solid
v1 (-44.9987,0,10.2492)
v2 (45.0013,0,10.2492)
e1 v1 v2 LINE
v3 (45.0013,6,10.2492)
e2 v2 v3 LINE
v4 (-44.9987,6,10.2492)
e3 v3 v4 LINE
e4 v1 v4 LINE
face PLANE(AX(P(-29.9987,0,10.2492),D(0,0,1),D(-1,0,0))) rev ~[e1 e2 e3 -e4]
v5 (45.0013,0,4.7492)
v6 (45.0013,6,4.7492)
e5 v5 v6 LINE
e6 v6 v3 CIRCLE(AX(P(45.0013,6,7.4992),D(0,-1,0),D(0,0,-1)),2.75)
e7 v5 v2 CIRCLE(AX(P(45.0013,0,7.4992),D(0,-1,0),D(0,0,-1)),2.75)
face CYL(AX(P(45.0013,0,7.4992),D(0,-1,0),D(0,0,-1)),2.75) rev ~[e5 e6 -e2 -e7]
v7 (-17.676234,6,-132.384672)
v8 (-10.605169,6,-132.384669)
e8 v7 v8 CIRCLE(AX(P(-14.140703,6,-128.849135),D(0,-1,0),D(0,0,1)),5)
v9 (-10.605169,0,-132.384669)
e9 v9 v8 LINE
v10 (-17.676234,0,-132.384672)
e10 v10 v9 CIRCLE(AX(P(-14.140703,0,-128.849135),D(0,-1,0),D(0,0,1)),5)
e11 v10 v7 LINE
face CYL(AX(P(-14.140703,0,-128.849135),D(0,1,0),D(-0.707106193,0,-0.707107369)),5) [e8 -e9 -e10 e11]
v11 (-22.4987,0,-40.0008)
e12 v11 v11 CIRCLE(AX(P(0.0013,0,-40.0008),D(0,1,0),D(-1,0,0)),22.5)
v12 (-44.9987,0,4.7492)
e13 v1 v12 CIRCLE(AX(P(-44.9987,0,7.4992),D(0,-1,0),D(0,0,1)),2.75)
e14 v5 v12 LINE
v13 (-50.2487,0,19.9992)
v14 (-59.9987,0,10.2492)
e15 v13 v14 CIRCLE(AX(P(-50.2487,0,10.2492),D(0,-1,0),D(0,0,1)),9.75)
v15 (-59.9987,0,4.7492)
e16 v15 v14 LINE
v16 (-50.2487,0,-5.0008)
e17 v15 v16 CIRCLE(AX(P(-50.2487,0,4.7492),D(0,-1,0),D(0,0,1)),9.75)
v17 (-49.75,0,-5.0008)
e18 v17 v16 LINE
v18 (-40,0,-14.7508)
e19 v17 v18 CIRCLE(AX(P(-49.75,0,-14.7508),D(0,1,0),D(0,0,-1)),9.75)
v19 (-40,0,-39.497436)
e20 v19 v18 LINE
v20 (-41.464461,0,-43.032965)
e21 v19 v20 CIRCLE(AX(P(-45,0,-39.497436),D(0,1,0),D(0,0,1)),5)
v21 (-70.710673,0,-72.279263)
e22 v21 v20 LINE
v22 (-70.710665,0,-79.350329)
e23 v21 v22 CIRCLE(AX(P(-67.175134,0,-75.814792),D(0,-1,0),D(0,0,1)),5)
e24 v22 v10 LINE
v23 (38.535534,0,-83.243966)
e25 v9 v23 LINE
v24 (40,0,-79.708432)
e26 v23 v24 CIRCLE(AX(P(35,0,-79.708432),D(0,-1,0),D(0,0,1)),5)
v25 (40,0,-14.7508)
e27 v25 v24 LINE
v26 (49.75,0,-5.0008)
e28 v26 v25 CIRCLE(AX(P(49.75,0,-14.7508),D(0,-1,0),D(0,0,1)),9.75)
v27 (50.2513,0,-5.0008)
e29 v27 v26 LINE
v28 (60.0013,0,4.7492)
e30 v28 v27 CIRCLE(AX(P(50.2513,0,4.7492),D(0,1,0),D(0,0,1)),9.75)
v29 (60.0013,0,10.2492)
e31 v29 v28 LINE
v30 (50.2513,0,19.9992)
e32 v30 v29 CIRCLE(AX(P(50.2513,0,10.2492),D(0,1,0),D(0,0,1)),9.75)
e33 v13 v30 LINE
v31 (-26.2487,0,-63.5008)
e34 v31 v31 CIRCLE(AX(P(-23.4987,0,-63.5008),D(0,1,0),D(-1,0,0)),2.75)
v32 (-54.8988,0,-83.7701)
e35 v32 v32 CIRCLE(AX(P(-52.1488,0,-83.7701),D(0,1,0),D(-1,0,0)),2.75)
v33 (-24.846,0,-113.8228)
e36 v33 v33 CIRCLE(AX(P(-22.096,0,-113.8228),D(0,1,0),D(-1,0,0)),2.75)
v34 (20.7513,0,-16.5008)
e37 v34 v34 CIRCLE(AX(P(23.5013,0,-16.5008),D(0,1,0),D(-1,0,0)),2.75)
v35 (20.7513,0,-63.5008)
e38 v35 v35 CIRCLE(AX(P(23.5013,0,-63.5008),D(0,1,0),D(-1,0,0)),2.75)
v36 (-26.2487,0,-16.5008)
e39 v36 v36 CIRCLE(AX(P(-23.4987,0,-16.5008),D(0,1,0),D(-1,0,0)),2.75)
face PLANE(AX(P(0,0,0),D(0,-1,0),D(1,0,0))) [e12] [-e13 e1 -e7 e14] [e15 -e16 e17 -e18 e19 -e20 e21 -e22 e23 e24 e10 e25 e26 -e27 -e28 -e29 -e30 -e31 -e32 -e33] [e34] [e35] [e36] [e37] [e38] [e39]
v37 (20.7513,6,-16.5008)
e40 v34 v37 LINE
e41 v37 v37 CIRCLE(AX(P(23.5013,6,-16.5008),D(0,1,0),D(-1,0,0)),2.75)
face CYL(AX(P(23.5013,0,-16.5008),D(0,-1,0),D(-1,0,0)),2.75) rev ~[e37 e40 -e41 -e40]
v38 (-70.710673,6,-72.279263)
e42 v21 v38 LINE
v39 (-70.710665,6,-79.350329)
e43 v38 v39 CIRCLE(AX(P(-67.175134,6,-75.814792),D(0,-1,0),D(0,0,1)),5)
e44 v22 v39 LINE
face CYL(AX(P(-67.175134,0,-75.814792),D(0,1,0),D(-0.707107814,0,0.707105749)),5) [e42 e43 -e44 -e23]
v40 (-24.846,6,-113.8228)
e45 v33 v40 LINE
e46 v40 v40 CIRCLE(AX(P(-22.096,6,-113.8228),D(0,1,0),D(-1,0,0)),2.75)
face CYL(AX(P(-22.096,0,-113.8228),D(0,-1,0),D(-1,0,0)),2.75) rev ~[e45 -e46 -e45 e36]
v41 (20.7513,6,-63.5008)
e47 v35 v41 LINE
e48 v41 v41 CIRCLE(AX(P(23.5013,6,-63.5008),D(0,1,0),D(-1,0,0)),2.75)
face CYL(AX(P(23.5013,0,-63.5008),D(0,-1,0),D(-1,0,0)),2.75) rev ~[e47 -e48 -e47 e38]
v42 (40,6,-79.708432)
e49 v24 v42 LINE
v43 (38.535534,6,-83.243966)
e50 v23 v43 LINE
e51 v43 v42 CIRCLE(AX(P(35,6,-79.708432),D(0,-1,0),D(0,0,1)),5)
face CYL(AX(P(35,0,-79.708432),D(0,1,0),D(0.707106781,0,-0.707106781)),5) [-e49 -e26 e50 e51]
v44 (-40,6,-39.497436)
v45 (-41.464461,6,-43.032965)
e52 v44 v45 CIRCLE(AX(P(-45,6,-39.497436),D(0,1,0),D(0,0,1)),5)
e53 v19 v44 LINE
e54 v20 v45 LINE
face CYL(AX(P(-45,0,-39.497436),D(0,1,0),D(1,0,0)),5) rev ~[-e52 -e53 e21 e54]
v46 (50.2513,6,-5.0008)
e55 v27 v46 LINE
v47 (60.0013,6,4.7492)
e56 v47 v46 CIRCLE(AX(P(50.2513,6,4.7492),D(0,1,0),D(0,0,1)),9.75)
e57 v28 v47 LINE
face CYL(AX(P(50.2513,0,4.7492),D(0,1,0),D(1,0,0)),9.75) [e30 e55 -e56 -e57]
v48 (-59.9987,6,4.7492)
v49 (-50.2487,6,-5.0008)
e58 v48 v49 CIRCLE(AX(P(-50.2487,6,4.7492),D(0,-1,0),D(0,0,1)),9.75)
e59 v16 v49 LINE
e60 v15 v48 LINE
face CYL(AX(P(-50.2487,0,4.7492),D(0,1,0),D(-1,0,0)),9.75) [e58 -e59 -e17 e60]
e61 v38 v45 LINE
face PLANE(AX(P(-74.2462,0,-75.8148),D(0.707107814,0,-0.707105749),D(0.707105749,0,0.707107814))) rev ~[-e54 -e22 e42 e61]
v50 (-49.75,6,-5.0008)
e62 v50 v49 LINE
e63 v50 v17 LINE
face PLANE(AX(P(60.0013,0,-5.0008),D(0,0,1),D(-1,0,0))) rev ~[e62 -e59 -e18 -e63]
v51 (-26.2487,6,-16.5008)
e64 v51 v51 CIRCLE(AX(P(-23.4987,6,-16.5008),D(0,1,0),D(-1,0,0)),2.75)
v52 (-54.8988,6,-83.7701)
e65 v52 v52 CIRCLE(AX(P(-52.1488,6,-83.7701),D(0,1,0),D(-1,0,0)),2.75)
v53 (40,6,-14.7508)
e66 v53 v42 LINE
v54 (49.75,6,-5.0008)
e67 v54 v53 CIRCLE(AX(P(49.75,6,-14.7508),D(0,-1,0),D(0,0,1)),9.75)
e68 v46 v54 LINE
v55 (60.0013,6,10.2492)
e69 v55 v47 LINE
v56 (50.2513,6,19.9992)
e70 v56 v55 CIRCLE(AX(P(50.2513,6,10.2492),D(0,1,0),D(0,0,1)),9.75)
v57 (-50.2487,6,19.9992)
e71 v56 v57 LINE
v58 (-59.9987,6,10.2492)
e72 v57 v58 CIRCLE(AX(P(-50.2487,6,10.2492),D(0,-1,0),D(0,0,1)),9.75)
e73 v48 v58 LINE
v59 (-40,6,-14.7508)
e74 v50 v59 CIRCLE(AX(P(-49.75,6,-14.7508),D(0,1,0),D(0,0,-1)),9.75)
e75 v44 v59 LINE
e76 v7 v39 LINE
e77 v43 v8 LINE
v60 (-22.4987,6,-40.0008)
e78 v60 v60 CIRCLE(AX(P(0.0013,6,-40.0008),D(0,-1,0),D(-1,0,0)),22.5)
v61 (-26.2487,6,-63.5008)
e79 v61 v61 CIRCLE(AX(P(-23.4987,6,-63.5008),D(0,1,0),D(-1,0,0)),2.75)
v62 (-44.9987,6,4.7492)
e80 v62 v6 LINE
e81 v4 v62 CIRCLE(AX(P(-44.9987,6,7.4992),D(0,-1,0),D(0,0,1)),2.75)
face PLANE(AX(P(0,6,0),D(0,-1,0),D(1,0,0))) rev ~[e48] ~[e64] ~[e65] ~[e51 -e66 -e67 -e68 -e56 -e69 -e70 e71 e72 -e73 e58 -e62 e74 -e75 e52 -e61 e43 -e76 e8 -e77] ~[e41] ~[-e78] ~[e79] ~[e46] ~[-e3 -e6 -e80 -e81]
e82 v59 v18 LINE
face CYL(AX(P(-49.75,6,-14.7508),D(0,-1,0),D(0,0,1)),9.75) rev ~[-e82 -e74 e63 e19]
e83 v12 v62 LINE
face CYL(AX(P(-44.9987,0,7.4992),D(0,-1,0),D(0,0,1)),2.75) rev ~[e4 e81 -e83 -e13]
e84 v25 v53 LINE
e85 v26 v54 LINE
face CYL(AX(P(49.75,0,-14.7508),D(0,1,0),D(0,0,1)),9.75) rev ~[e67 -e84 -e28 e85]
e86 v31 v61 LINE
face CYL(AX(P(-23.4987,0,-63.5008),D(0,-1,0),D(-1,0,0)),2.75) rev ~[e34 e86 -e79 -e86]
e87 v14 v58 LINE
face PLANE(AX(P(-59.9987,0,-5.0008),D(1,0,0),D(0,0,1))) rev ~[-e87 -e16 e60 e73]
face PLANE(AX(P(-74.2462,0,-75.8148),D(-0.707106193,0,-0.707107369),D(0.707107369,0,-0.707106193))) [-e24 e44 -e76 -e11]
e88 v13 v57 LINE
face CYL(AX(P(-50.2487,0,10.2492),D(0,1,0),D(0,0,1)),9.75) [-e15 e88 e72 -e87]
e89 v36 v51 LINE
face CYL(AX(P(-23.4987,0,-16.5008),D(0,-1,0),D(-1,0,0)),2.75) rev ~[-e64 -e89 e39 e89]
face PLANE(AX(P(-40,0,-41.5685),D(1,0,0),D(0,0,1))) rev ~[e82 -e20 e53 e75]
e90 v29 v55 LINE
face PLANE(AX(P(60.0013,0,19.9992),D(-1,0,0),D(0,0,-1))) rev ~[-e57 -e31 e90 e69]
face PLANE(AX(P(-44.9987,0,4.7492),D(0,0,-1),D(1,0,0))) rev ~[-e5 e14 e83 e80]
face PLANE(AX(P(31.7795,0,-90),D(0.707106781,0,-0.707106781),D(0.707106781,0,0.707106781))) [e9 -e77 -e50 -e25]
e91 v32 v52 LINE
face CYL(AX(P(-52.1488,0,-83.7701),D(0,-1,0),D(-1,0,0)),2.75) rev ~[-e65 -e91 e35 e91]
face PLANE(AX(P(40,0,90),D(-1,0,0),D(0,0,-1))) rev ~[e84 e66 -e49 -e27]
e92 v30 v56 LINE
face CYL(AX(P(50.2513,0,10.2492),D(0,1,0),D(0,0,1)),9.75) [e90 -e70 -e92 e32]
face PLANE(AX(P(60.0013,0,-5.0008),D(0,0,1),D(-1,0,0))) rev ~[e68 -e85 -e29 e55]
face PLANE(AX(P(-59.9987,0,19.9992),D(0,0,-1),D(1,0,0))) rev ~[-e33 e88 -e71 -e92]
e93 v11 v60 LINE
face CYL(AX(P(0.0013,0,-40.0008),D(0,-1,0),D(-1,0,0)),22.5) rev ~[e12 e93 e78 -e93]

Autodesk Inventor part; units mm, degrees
ref_plane "YZ Plane" through (0, 0, 0) normal (1, 0, 0) x (0, 1, 0)
sketch "Sketch1" plane through (0, 0, 0) normal (0, 1, 0) x (-1, 0, 0)
  line L0 (40, 90) -> (-40, 90)
  line L1 (-40, 90) -> (-40, -81.7795)
  line L2 (40, -41.5685) -> (40, 90)
  line L3 (40, 90) -> (-40, -90) construction
  line L4 (-40, 90) -> (40, -90) construction
  circle A0 centre (-0.0013, 54.9992) radius 5.1
  line L5 (23.4987, -16.5008) -> (-23.5013, -16.5008) construction
  line L6 (-23.5013, -16.5008) -> (-23.5013, -63.5008) construction
  line L7 (-23.5013, -63.5008) -> (23.4987, -63.5008) construction
  line L8 (23.4987, -63.5008) -> (23.4987, -16.5008) construction
  line L9 (23.4987, -16.5008) -> (-23.5013, -63.5008) construction
  line L10 (-23.5013, -16.5008) -> (23.4987, -63.5008) construction
  circle A1 centre (23.4987, -16.5008) radius 2.75
  circle A2 centre (23.4987, -63.5008) radius 2.75
  circle A3 centre (-23.5013, -16.5008) radius 2.75
  circle A4 centre (-23.5013, -63.5008) radius 2.75
  line L11 (-0.0013, -90.0008) -> (-0.0013, -80) construction
  line L12 (19.9987, -11.0008) -> (-20.0013, -11.0008) construction
  line L13 (-20.0013, -11.0008) -> (-20.0013, -69.0008) construction
  line L14 (-20.0013, -69.0008) -> (19.9987, -69.0008) construction
  line L15 (19.9987, -69.0008) -> (19.9987, -11.0008) construction
  line L16 (19.9987, -11.0008) -> (-20.0013, -69.0008) construction
  line L17 (-20.0013, -11.0008) -> (19.9987, -69.0008) construction
  line L18 (-29.0013, -60.0008) -> (28.9987, -60.0008) construction
  line L19 (28.9987, -60.0008) -> (28.9987, -20.0008) construction
  line L20 (28.9987, -20.0008) -> (-29.0013, -20.0008) construction
  line L21 (-29.0013, -20.0008) -> (-29.0013, -60.0008)
  line L22 (-29.0013, -60.0008) -> (28.9987, -20.0008) construction
  line L23 (28.9987, -60.0008) -> (-29.0013, -20.0008) construction
  line L24 (-0.0013, 54.9992) -> (102.5291, -47.5313) construction
  line L25 (-0.0013, 54.9992) -> (144.9987, 54.9992) construction
  line L26 (28.2843, 83.2843) -> (-28.2843, 26.7157) construction
  line L27 (-28.2843, 26.7157) -> (74.2462, -75.8148) construction
  line L28 (74.2462, -75.8148) -> (130.8148, -19.2462) construction
  line L29 (130.8148, -19.2462) -> (28.2843, 83.2843) construction
  line L30 (28.2843, 83.2843) -> (74.2462, -75.8148) construction
  line L31 (-28.2843, 26.7157) -> (130.8148, -19.2462) construction
  line L32 (74.2462, -75.8148) -> (14.1407, -135.9202)
  line L33 (14.1407, -135.9202) -> (-0.0014, -121.7781)
  line L34 (-0.0014, -121.7781) -> (-31.7795, -90)
  line L35 (74.2462, -75.8148) -> (40, -41.5685)
  line L36 (-31.7795, -90) -> (-40, -81.7795)
  line L37 (44.1935, -105.8675) -> (37.1224, -98.7964)
  line L38 (37.1224, -98.7964) -> (52.1488, -83.7701) construction
  line L39 (37.1224, -98.7964) -> (22.096, -113.8228) construction
  circle A5 centre (52.1488, -83.7701) radius 2.75
  circle A6 centre (22.096, -113.8228) radius 2.75
  line L40 (-0.0013, 54.9992) -> (-0.0013, -40.0008)
  circle A7 centre (-0.0013, -40.0008) radius 22.5
  point P0 (0, 0)
  point P1 (51.2639, 3.7339)
  dimension "d0" = 80
  dimension "d1" = 180
  dimension "d3" = 10.2
  dimension "d5" = 47
  dimension "d6" = 47
  dimension "d7" = 5.5
  dimension "d8" = 5.5
  dimension "d9" = 5.5
  dimension "d10" = 5.5
  dimension "d12" = 40
  dimension "d13" = 58
  dimension "d14" = 58
  dimension "d15" = 40
  dimension "d27" = 45
  dimension "d28" = 145
  dimension "d29" = 80
  dimension "d30" = 145
  dimension "d31" = 85.002
  dimension "d32" = 20
  dimension "d33" = 10
  dimension "d35" = 21.2505
  dimension "d36" = 21.2505
  dimension "d37" = 5.5
  dimension "d38" = 5.5
  dimension "d53" = 95
  dimension "d54" = 45
extrude "Plate3" add sketch "Sketch1" along normal blind 6
fillet "Fillet6" radius 5 4 edges at (-40, 3, -41.5685) (-74.2462, 3, -75.8148) (-14.1407, 3, -135.9202) (40, 3, -81.7795)
fillet "Fillet7" radius 40 2 edges at (40, 3, 90) (-40, 3, 90)
sketch "Sketch2" plane through (0, 0, 0) normal (0, -1, 0) x (1, 0, 0)
  circle A0 centre (0.0013, 54.9992) radius 5.1 projected
  line L0 (0.0013, 54.9992) -> (0.0013, -40.0008) construction
  line L1 (0.0013, 7.4992) -> (55.0013, 7.4992) construction
  line L2 (0.0013, 7.4992) -> (-54.9987, 7.4992) construction
  line L3 (-29.9987, 7.4992) -> (30.0013, 7.4992) construction
  line L4 (-29.9987, 4.7492) -> (30.0013, 4.7492)
  line L5 (30.0013, 10.2492) -> (-29.9987, 10.2492)
  arc A1 (-29.9987, 10.2492) -> (-29.9987, 4.7492) centre (-29.9987, 7.4992) ccw
  arc A2 (30.0013, 4.7492) -> (30.0013, 10.2492) centre (30.0013, 7.4992) ccw
  point P0 (0, 0)
  dimension "d43" = 95
  dimension "d44" = 55
  dimension "d45" = 55
  dimension "d46" = 30
  dimension "d47" = 5.5
extrude "Extrusion1" cut sketch "Sketch2" against normal blind 10 contours A1 L5 A2 L4
ref_plane "Work Plane2" through (30.0013, 0, 7.4992) normal (0, 0, -1) x (-1, 0, 0)
sketch "Sketch3" plane through (0, 0, 0) normal (0, -1, 0) x (1, 0, 0)
  line L0 (-29.9987, 4.7492) -> (30.0013, 4.7492) construction
  line L1 (0.0013, 4.7492) -> (0.0013, 10.2492) construction
  line L2 (30.0013, 10.2492) -> (-29.9987, 10.2492) construction
  point P0 (0, 0)
sketch "Sketch4" plane through (0, 0, 0) normal (0, -1, 0) x (1, 0, 0)
  line L0 (-29.9987, 4.7492) -> (30.0013, 4.7492)
  line L1 (0.0013, 4.7492) -> (0.0013, 10.2492)
  line L2 (30.0013, 10.2492) -> (-29.9987, 10.2492)
  line L3 (-59.9987, 19.9992) -> (60.0013, 19.9992)
  line L4 (60.0013, 19.9992) -> (60.0013, -5.0008)
  line L5 (60.0013, -5.0008) -> (-59.9987, -5.0008)
  line L6 (-59.9987, -5.0008) -> (-59.9987, 19.9992)
  line L7 (-59.9987, 19.9992) -> (60.0013, -5.0008) construction
  line L8 (60.0013, 19.9992) -> (-59.9987, -5.0008) construction
  line L9 (-29.9987, 7.4992) -> (30.0013, 7.4992) construction
  line L10 (-29.9987, 4.7492) -> (30.0013, 4.7492)
  line L11 (30.0013, 10.2492) -> (-29.9987, 10.2492)
  arc A0 (-29.9987, 10.2492) -> (-29.9987, 4.7492) centre (-29.9987, 7.4992) ccw
  arc A1 (30.0013, 4.7492) -> (30.0013, 10.2492) centre (30.0013, 7.4992) ccw
  point P0 (0, 0)
  point P1 (0.0013, 7.4992)
  dimension "d56" = 120
  dimension "d57" = 25
sheet face with bend "Face4" sketch "Sketch4" thickness 6 toward (0, 1, 0) bend radius 6
bend "Bend1"
fillet "Fillet11" radius 9.75 4 edges at (60.0013, 3, -5.0008) (60.0013, 3, 19.9992) (-59.9987, 3, -5.0008) (-59.9987, 3, 19.9992)
sketch "Sketch5" plane through (0, 0, 0) normal (0, -1, 0) x (1, 0, 0)
  line L0 (-29.9987, 4.7492) -> (30.0013, 4.7492) projected
  line L1 (0.0013, 4.7492) -> (0.0013, 10.2492)
  line L2 (30.0013, 10.2492) -> (-29.9987, 10.2492) projected
  line L3 (-44.9987, 7.4992) -> (45.0013, 7.4992) construction
  line L4 (-44.9987, 4.7492) -> (45.0013, 4.7492)
  line L5 (45.0013, 10.2492) -> (-44.9987, 10.2492)
  arc A0 (-44.9987, 10.2492) -> (-44.9987, 4.7492) centre (-44.9987, 7.4992) ccw
  arc A1 (45.0013, 4.7492) -> (45.0013, 10.2492) centre (45.0013, 7.4992) ccw
  point P0 (0, 0)
  point P1 (0.0013, 7.4992)
  dimension "d64" = 45
  dimension "d65" = 5.5
extrude "Extrusion2" cut sketch "Sketch5" against normal blind 10
fillet "Fillet12" radius 9.75 4 edges at (40, 3, -5.0008) (-40, 3, -5.0008) (-40, 3, 19.9992) (40, 3, 19.9992)
sketch "Sketch6" plane through (0, 0, 0) normal (0, -1, 0) x (1, 0, 0)
  arc A0 (40, 29.7492) -> (49.75, 19.9992) centre (49.75, 29.7492) ccw projected
  arc A1 (-49.75, 19.9992) -> (-40, 29.7492) centre (-49.75, 29.7492) ccw projected
  line L0 (49.75, 19.9992) -> (-49.75, 19.9992)
  arc A2 (60.0013, 10.2492) -> (50.2513, 19.9992) centre (50.2513, 10.2492) ccw projected
  line L1 (50.2513, 19.9992) -> (-50.2487, 19.9992)
  line L2 (-50.2487, 19.9992) -> (-50.2487, 91.8023)
  line L3 (-50.2487, 91.8023) -> (50.2513, 91.8023)
  line L4 (50.2513, 91.8023) -> (50.2513, 19.9992)
  point P0 (0, 0)
extrude "Extrusion3" cut sketch "Sketch6" against normal through all
ref_plane "Work Plane3" through (-44.9987, 0, 7.4992) normal (0, 0, 1) x (1, 0, 0)
equation "\"d39\" = Thickness"
equation "\"BendRadius\" = Thickness"
equation "\"BendReliefWidth\" = Thickness"
equation "\"BendReliefDepth\" = 0.5 * Thickness"
equation "\"CornerReliefSize\" = 4 * Thickness"
equation "\"MinimumRemnant\" = 2 * Thickness"
equation "\"TransitionRadius\" = BendRadius"
equation "\"JacobiRadiusSize\" = BendRadius"
equation "\"GapSize\" = Thickness"
equation "\"Thickness\" = 6"
properties part number "NEMA23MountPlatev2" material "Aluminum 6061"
